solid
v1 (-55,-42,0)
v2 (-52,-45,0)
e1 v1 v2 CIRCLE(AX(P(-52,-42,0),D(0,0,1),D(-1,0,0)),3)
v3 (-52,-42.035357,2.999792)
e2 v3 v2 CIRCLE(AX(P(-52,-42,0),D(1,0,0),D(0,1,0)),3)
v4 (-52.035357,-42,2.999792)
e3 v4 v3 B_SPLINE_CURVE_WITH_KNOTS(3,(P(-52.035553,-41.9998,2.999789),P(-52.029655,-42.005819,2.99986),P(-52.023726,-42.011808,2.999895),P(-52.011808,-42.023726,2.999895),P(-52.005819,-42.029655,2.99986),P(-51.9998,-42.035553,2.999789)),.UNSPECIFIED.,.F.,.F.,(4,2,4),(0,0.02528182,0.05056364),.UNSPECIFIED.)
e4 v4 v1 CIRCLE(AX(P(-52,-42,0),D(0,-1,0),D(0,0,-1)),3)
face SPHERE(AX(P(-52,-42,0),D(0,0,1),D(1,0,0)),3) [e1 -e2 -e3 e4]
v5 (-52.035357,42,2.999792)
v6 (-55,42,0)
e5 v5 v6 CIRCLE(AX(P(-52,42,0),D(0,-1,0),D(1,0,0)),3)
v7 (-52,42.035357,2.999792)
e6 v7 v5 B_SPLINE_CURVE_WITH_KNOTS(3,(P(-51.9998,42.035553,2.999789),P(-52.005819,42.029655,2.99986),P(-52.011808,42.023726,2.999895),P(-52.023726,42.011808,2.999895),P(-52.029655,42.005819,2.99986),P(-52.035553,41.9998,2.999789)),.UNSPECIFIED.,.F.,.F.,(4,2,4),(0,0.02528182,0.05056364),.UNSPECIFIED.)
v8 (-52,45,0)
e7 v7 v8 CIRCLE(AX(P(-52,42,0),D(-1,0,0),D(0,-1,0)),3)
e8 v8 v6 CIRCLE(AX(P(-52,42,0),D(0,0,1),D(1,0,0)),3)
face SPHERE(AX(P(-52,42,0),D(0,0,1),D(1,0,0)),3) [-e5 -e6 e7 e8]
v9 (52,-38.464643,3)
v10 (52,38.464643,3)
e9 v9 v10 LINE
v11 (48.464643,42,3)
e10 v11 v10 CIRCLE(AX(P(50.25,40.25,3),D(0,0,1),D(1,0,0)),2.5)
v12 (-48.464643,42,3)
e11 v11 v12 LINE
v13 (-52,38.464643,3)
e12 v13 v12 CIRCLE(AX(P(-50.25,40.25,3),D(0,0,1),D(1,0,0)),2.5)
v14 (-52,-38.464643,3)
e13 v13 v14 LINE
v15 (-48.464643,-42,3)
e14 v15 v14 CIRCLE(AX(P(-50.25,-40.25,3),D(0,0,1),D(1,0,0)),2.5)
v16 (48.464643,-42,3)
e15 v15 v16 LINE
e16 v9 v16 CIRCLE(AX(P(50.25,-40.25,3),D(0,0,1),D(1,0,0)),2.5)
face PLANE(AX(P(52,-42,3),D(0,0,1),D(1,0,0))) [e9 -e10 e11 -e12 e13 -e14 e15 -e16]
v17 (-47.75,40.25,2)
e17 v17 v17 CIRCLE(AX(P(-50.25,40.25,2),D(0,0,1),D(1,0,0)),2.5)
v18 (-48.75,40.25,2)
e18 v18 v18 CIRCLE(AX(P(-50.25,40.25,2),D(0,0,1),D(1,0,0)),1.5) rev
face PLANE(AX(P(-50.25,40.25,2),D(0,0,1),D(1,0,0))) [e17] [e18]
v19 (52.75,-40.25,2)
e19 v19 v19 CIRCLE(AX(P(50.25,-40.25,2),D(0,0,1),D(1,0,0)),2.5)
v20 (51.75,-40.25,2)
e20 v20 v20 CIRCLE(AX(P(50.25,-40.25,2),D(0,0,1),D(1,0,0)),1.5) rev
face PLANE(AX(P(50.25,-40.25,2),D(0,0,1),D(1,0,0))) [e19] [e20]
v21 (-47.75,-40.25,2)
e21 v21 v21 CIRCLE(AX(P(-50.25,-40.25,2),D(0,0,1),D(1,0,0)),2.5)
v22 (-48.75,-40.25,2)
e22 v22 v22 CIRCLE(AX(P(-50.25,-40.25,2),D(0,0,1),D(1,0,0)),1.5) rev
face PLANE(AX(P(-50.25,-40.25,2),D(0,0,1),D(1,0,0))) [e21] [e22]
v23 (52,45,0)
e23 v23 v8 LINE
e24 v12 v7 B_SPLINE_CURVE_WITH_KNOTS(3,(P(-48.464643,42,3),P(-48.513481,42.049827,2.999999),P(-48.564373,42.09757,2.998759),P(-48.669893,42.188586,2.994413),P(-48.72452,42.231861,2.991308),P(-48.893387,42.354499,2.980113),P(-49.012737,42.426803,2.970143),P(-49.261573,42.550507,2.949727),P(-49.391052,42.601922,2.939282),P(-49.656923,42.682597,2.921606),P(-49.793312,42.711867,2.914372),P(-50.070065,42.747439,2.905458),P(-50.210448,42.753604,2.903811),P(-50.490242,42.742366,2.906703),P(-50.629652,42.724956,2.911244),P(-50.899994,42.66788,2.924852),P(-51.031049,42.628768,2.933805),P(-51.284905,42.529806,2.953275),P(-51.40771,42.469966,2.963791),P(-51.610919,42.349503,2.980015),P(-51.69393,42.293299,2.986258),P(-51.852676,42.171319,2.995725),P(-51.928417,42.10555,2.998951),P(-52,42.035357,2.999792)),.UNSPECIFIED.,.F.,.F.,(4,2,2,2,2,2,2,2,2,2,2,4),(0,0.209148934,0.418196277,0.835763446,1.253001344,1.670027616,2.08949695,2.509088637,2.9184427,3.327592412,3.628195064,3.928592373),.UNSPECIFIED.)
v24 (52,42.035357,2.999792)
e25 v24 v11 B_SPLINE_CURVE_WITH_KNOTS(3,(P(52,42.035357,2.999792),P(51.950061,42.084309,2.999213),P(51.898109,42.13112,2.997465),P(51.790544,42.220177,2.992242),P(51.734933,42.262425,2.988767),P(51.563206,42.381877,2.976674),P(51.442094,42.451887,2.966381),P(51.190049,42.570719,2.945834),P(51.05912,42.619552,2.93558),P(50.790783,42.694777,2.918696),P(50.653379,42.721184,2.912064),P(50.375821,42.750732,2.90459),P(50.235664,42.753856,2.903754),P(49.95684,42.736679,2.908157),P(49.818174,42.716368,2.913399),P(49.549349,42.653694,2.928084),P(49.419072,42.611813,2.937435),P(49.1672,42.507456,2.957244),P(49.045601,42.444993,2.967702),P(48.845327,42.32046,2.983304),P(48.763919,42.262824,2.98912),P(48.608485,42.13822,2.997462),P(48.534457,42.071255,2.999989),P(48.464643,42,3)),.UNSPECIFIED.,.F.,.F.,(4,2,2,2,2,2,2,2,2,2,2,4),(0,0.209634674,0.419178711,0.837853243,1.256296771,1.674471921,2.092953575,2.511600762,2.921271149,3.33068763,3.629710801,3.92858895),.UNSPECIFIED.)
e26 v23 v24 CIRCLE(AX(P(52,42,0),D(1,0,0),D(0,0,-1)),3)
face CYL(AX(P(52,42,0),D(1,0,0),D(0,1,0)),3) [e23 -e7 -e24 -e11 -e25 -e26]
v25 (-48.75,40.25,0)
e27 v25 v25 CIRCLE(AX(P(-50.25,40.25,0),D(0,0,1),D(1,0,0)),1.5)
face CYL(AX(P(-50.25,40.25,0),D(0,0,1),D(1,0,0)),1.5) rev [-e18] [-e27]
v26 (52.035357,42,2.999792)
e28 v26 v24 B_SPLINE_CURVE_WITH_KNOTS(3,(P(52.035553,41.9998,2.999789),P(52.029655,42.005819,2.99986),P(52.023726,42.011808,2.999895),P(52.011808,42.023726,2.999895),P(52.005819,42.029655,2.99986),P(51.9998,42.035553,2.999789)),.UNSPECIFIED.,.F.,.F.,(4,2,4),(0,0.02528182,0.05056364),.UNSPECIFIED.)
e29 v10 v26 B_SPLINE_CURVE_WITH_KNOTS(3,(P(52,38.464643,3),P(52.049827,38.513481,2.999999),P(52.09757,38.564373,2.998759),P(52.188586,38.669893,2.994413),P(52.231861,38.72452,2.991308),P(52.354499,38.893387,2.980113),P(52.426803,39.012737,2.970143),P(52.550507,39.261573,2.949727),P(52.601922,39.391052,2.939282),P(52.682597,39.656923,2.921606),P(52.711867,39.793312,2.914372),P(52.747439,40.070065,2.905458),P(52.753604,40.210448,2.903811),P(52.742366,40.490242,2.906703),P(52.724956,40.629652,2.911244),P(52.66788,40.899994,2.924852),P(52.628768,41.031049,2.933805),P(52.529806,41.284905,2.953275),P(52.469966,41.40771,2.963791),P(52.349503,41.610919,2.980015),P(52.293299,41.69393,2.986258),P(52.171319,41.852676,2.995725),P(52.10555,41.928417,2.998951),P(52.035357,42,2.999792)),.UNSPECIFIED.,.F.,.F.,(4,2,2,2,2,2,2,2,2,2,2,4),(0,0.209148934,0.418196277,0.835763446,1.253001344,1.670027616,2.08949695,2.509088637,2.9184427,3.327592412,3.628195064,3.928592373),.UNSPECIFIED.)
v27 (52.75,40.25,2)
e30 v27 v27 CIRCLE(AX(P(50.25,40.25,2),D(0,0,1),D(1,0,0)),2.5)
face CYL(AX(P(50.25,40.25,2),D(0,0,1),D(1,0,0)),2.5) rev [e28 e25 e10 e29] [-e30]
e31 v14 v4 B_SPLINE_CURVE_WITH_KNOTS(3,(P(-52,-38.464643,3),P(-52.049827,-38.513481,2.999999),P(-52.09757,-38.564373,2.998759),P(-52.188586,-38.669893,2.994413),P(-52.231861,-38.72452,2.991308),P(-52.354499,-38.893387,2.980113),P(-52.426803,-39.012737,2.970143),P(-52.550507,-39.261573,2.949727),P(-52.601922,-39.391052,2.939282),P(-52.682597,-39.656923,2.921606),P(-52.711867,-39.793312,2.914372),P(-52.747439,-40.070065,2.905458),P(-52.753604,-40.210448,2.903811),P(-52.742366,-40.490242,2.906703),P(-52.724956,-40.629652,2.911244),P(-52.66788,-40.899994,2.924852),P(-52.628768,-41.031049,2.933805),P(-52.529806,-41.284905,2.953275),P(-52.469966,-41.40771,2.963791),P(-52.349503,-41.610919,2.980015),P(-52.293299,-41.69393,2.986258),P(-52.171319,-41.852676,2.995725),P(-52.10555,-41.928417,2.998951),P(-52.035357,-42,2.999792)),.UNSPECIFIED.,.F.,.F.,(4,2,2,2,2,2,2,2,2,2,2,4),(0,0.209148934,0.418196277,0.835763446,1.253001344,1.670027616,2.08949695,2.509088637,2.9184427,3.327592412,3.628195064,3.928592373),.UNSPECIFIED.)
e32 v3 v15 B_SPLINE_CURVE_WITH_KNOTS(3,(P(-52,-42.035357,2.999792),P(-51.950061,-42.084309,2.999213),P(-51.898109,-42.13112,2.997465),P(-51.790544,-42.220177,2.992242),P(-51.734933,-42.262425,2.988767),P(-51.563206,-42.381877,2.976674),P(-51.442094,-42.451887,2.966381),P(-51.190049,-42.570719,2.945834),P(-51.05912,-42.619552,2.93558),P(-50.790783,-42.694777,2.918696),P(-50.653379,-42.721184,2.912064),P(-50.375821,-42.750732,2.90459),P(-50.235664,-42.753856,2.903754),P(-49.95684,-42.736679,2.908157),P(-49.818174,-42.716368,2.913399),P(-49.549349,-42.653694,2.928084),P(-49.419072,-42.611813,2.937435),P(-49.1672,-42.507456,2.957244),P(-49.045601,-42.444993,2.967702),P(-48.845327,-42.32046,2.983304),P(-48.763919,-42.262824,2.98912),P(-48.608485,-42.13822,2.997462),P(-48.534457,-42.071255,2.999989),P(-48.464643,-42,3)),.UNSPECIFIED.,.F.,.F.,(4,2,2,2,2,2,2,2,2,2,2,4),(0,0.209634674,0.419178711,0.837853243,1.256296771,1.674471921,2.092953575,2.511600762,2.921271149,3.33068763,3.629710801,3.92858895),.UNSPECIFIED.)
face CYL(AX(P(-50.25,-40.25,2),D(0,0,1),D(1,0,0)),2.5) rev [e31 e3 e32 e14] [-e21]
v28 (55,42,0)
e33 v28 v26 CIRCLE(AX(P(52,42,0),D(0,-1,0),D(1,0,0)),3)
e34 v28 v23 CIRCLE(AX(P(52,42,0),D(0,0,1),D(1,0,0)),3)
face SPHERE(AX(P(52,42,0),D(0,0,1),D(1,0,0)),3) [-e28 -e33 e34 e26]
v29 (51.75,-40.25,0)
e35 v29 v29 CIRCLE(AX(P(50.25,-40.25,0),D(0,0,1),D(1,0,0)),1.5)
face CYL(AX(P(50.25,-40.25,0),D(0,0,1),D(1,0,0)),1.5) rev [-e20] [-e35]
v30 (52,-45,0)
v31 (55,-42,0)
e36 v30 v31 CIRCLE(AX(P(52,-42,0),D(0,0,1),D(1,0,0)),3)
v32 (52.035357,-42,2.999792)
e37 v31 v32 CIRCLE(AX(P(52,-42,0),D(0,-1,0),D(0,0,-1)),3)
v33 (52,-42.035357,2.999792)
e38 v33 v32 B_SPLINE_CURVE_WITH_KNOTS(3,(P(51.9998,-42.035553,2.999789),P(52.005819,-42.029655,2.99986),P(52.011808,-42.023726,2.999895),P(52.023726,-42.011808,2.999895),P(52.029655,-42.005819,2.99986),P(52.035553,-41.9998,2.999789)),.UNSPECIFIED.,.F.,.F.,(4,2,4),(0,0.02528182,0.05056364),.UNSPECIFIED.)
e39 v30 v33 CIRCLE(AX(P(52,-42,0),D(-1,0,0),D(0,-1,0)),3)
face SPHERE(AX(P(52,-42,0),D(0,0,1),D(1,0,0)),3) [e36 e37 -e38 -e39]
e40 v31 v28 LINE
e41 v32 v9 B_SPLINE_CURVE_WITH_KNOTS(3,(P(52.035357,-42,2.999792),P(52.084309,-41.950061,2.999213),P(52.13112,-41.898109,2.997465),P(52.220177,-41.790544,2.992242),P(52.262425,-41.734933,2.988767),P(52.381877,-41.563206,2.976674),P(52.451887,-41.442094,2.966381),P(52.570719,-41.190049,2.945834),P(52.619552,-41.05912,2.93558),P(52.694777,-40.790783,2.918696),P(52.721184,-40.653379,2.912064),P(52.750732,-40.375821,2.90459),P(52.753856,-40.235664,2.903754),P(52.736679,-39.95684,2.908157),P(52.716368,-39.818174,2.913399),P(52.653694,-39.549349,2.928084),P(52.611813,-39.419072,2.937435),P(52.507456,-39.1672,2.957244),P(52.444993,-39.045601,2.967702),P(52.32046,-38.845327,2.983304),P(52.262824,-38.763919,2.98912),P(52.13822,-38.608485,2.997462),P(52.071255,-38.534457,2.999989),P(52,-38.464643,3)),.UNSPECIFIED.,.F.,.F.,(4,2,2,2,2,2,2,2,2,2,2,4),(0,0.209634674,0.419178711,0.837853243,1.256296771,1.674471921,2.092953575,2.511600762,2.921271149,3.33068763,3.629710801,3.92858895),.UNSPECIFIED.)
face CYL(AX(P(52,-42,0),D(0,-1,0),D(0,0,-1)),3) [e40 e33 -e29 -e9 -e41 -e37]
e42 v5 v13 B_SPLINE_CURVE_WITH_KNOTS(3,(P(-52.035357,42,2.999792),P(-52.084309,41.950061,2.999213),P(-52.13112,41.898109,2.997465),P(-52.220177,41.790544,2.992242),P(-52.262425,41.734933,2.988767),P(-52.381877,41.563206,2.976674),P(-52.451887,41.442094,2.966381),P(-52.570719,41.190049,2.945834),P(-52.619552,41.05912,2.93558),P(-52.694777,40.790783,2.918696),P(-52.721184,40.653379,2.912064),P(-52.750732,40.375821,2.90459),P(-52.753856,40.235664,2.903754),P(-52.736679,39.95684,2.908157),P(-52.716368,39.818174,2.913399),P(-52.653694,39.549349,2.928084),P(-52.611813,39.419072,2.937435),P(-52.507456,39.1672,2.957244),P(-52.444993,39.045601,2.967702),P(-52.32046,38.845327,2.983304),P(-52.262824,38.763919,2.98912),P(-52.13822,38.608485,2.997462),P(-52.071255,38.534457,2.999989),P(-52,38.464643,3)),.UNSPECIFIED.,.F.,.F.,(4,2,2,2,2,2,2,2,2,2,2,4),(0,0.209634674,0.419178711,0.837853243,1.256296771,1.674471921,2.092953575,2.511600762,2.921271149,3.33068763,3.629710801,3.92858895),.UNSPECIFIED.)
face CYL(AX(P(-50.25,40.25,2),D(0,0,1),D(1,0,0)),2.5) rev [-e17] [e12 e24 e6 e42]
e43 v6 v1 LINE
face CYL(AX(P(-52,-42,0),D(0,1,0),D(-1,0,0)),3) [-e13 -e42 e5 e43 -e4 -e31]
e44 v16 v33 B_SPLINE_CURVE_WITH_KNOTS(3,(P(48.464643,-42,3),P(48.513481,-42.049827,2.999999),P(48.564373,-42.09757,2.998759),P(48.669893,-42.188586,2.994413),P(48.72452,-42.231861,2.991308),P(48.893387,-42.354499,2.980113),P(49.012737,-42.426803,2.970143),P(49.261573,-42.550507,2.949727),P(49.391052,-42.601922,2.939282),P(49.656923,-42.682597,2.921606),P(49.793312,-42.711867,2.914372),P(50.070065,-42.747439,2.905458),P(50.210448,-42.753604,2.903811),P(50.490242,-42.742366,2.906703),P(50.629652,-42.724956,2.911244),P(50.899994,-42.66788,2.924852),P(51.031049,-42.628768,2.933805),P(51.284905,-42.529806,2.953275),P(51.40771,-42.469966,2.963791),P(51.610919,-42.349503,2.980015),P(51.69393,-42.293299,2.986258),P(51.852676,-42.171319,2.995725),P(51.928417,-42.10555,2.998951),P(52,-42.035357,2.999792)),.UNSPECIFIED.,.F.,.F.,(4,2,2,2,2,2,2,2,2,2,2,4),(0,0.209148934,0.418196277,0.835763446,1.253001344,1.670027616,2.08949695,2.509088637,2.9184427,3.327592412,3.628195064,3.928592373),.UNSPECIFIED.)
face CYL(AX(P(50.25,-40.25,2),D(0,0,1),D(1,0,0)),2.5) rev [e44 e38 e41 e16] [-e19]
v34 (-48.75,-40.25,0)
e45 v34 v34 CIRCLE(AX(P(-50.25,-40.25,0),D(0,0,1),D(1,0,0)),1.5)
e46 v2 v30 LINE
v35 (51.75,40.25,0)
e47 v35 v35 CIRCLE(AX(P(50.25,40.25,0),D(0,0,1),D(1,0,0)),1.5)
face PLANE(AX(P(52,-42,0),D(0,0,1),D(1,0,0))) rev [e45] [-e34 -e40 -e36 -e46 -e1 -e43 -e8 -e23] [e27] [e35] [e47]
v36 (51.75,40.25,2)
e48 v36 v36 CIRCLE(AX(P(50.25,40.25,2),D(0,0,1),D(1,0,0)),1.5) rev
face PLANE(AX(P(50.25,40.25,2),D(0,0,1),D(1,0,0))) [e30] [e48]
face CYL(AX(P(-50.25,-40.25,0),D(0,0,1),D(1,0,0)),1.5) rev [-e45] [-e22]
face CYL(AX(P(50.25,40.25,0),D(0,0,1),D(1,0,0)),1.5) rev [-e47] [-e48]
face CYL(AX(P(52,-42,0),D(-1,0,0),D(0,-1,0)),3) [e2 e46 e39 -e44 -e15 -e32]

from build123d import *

# Parameters (mm, degrees)
BOSS_EXTRUDE1_DEPTH = 3
FILLET3_R           = 3
SKETCH2_R           = 1.5
CUT_EXTRUDE1_DEPTH  = 72.126647608
SKETCH3_R           = 2.5
CUT_EXTRUDE2_DEPTH  = 1


with BuildPart() as part:
    # Sketch1 → Boss-Extrude1 (new body)
    with BuildSketch(Plane.XY):
        with BuildLine():
            Line((52, -45), (-52, -45))
            ThreePointArc((-52, -45), (-54.121320344, -44.121320344), (-55, -42))
            Line((-55, -42), (-55, 42))
            ThreePointArc((-55, 42), (-54.121320344, 44.121320344), (-52, 45))
            Line((-52, 45), (52, 45))
            ThreePointArc((52, 45), (54.121320344, 44.121320344), (55, 42))
            Line((55, 42), (55, -42))
            ThreePointArc((55, -42), (54.121320344, -44.121320344), (52, -45))
        make_face()
    extrude(amount=BOSS_EXTRUDE1_DEPTH)

    # Fillet3
    fillet3_edges = [part.edges().sort_by_distance(p)[0] for p in [
        (0, -45, 3),
        (-54.121320344, -44.121320344, 3),
        (-55, 0, 3),
        (-54.121320344, 44.121320344, 3),
        (0, 45, 3),
        (54.121320344, 44.121320344, 3),
        (55, 0, 3),
        (54.121320344, -44.121320344, 3),
    ]]
    fillet(fillet3_edges, radius=FILLET3_R - 0.0001)  # a hair under: the kernel refuses the full size

    # Sketch2 → Cut-Extrude1 (cut, through all)
    with BuildSketch(Plane.XY.offset(3)):
        with Locations((-50.25, 40.25)):
            Circle(SKETCH2_R)
        with Locations((50.25, 40.25)):
            Circle(SKETCH2_R)
        with Locations((-50.25, -40.25)):
            Circle(SKETCH2_R)
        with Locations((50.25, -40.25)):
            Circle(SKETCH2_R)
    extrude(amount=-CUT_EXTRUDE1_DEPTH, mode=Mode.SUBTRACT)

    # Sketch3 → Cut-Extrude2 (cut)
    with BuildSketch(Plane.XY.offset(3)):
        with Locations((-50.25, 40.25)):
            Circle(SKETCH3_R)
        with Locations((50.25, 40.25)):
            Circle(SKETCH3_R)
        with Locations((-50.25, -40.25)):
            Circle(SKETCH3_R)
        with Locations((50.25, -40.25)):
            Circle(SKETCH3_R)
    extrude(amount=-CUT_EXTRUDE2_DEPTH, mode=Mode.SUBTRACT)


solid = part.part
